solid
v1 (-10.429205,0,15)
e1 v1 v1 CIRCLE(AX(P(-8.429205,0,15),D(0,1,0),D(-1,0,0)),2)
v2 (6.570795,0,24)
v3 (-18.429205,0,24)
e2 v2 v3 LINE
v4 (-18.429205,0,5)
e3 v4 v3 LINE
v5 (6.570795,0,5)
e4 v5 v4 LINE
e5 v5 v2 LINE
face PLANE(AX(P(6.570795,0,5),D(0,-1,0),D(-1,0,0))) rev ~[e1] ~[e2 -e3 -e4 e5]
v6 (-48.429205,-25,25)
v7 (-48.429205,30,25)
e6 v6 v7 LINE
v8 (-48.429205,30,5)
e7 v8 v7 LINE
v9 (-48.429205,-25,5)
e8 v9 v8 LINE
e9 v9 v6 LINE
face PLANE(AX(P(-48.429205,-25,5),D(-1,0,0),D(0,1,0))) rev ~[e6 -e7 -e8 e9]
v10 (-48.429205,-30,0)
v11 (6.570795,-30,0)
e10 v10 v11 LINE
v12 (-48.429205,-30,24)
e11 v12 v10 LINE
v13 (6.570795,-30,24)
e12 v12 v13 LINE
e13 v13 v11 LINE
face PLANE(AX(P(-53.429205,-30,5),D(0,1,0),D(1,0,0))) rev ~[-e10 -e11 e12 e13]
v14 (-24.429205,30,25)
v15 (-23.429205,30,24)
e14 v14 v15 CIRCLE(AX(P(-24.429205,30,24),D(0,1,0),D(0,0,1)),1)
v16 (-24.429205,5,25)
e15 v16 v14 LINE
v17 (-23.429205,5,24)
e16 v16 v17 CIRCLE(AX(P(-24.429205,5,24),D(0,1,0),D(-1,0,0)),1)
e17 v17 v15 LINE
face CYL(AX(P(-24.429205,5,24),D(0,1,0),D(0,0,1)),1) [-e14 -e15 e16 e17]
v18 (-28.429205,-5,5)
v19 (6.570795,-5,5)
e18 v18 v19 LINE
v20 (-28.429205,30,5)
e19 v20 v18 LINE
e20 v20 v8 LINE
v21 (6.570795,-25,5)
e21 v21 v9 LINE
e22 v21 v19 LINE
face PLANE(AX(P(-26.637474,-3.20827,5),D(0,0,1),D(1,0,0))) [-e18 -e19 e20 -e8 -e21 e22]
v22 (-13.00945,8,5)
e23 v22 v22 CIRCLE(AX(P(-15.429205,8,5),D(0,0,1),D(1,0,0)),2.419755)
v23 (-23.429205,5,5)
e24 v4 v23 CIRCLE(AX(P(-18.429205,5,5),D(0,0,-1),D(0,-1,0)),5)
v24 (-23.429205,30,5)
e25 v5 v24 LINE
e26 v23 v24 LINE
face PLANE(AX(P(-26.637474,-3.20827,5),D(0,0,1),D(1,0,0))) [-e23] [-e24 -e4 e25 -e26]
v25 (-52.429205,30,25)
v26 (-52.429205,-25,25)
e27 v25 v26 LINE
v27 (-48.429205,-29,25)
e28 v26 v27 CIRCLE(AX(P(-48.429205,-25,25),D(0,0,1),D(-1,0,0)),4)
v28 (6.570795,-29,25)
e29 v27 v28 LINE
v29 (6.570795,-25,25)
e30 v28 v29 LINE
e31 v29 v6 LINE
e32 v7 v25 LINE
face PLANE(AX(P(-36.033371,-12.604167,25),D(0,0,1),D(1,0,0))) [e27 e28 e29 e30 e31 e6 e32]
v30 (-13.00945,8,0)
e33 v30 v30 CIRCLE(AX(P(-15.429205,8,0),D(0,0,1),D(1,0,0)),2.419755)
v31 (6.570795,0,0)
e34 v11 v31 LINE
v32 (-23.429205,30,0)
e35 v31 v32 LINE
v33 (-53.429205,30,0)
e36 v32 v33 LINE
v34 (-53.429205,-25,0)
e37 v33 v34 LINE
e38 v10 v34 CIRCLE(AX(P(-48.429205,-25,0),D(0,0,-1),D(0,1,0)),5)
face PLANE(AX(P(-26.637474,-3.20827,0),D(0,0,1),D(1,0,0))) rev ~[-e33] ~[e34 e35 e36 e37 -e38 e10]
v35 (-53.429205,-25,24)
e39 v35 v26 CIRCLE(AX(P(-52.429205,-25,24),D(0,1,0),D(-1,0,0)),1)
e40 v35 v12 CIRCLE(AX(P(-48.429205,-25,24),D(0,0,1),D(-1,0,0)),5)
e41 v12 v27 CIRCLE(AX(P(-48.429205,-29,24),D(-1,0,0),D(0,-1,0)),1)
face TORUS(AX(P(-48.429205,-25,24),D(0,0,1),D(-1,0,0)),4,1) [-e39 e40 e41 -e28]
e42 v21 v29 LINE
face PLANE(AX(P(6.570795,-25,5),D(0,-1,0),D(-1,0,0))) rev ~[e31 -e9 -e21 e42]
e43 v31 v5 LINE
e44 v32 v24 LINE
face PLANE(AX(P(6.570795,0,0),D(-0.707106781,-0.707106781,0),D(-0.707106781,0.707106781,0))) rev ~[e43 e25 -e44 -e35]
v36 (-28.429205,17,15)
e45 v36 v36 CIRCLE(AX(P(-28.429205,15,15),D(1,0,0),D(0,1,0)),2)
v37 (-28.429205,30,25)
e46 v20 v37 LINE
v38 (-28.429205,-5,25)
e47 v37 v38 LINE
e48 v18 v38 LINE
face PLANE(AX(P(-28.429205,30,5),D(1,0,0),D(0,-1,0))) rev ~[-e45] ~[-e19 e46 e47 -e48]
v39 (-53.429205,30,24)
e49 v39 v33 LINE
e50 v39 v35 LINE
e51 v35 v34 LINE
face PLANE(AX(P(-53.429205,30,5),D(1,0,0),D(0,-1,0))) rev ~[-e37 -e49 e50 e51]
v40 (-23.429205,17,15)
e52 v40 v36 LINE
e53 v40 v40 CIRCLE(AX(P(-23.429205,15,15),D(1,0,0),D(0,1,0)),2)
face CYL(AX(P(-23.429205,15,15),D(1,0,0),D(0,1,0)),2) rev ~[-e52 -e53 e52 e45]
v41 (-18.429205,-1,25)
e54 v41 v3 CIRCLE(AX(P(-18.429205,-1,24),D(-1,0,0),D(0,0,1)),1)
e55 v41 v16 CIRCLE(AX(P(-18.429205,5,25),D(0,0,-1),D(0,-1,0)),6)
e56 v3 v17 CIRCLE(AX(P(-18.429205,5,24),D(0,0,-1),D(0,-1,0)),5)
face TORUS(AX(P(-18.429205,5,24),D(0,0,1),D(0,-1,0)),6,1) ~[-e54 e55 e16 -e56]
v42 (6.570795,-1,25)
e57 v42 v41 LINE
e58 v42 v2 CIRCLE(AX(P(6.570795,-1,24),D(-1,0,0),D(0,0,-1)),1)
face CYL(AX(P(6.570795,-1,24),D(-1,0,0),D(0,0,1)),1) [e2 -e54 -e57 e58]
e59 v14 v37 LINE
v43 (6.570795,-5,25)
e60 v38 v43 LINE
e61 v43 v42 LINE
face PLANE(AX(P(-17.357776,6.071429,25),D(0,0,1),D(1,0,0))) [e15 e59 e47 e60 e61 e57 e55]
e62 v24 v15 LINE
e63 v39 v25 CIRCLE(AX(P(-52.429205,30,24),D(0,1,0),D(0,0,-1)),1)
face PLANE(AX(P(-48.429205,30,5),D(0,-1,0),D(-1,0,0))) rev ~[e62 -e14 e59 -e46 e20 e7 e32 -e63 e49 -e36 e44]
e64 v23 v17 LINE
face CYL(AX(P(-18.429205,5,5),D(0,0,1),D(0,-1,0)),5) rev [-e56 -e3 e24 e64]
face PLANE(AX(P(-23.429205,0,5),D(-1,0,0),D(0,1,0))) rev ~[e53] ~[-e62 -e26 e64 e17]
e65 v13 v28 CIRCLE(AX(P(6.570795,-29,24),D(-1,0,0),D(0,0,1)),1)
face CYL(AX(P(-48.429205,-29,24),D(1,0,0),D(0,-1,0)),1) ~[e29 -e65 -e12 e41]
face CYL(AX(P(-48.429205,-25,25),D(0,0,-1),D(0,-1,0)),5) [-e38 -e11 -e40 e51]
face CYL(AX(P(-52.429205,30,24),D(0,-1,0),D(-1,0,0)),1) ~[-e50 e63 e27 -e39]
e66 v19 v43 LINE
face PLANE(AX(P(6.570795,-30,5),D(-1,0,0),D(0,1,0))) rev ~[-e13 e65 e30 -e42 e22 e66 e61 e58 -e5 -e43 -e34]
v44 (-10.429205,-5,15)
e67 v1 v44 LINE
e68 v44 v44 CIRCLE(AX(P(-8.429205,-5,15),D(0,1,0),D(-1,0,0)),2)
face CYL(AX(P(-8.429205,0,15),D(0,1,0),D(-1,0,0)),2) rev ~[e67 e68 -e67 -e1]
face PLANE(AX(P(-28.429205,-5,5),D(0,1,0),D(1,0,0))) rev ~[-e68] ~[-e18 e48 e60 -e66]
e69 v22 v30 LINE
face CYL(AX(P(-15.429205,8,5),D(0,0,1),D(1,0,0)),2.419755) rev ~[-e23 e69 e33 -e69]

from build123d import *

# Parameters (mm, degrees)
F1_DEPTH  = 5
F3_DEPTH  = 20
F6_R      = 2.4197546063
F7_DEPTH  = 25
F8_R      = 5
F9_R      = 5
F10_R     = 1
F4_R      = 2
F11_DEPTH = 10
F5_R      = 2
F12_DEPTH = 10


with BuildPart() as f1:
    # F0 (on Top) → F1 (new body)
    with BuildSketch(Plane.XY):
        Polygon((-23.4292047727, 30), (-53.4292047727, 30), (-53.4292047727, -30), (6.5707952273, -30), (6.5707952273, 0), align=None)
    extrude(amount=F1_DEPTH)

    # F2 (on face) → F3 (join)
    with BuildSketch(Plane.XY.offset(5)):
        Polygon((6.5707952273, -30), (6.5707952273, -25), (-48.4292047727, -25), (-48.4292047727, 30), (-53.4292047727, 30), (-53.4292047727, -30), align=None)
        Polygon((-28.4292047727, 30), (-28.4292047727, -5), (6.5707952273, -5), (6.5707952273, 0), (-23.4292047727, 0), (-23.4292047727, 30), align=None)
    extrude(amount=F3_DEPTH)

    # F6 (on face) → F7 (cut)
    with BuildSketch(Plane.XY.offset(5)):
        with Locations((-15.4292047727, 8)):
            Circle(F6_R)
    extrude(amount=-F7_DEPTH, mode=Mode.SUBTRACT)

    # F8
    f8_edges = [f1.edges().sort_by_distance(p)[0] for p in [
        (-23.429205, 0, 15),
    ]]
    fillet(f8_edges, radius=F8_R)

    # F9
    f9_edges = [f1.edges().sort_by_distance(p)[0] for p in [
        (-53.429205, -30, 12.5),
    ]]
    fillet(f9_edges, radius=F9_R)

    # F10
    f10_edges = [f1.edges().sort_by_distance(p)[0] for p in [
        (-20.929205, -30, 25),
        (-23.429205, 17.5, 25),
        (-53.429205, 2.5, 25),
        (-51.964739, -28.535534, 25),
        (-5.929205, 0, 25),
        (-21.964739, 1.464466, 25),
    ]]
    fillet(f10_edges, radius=F10_R)

    # F4 (on face) → F11 (cut)
    with BuildSketch(Plane.YZ.offset(-23.4292047727)):
        with Locations((15, 15)):
            Circle(F4_R)
    extrude(amount=-F11_DEPTH, mode=Mode.SUBTRACT)

    # F5 (on face) → F12 (cut)
    with BuildSketch(Plane(origin=(0, 0, 0), x_dir=(-1, 0, 0), z_dir=(0, 1, 0))):
        with Locations((8.4292047727, 15)):
            Circle(F5_R)
    extrude(amount=-F12_DEPTH, mode=Mode.SUBTRACT)


solid = f1.part
